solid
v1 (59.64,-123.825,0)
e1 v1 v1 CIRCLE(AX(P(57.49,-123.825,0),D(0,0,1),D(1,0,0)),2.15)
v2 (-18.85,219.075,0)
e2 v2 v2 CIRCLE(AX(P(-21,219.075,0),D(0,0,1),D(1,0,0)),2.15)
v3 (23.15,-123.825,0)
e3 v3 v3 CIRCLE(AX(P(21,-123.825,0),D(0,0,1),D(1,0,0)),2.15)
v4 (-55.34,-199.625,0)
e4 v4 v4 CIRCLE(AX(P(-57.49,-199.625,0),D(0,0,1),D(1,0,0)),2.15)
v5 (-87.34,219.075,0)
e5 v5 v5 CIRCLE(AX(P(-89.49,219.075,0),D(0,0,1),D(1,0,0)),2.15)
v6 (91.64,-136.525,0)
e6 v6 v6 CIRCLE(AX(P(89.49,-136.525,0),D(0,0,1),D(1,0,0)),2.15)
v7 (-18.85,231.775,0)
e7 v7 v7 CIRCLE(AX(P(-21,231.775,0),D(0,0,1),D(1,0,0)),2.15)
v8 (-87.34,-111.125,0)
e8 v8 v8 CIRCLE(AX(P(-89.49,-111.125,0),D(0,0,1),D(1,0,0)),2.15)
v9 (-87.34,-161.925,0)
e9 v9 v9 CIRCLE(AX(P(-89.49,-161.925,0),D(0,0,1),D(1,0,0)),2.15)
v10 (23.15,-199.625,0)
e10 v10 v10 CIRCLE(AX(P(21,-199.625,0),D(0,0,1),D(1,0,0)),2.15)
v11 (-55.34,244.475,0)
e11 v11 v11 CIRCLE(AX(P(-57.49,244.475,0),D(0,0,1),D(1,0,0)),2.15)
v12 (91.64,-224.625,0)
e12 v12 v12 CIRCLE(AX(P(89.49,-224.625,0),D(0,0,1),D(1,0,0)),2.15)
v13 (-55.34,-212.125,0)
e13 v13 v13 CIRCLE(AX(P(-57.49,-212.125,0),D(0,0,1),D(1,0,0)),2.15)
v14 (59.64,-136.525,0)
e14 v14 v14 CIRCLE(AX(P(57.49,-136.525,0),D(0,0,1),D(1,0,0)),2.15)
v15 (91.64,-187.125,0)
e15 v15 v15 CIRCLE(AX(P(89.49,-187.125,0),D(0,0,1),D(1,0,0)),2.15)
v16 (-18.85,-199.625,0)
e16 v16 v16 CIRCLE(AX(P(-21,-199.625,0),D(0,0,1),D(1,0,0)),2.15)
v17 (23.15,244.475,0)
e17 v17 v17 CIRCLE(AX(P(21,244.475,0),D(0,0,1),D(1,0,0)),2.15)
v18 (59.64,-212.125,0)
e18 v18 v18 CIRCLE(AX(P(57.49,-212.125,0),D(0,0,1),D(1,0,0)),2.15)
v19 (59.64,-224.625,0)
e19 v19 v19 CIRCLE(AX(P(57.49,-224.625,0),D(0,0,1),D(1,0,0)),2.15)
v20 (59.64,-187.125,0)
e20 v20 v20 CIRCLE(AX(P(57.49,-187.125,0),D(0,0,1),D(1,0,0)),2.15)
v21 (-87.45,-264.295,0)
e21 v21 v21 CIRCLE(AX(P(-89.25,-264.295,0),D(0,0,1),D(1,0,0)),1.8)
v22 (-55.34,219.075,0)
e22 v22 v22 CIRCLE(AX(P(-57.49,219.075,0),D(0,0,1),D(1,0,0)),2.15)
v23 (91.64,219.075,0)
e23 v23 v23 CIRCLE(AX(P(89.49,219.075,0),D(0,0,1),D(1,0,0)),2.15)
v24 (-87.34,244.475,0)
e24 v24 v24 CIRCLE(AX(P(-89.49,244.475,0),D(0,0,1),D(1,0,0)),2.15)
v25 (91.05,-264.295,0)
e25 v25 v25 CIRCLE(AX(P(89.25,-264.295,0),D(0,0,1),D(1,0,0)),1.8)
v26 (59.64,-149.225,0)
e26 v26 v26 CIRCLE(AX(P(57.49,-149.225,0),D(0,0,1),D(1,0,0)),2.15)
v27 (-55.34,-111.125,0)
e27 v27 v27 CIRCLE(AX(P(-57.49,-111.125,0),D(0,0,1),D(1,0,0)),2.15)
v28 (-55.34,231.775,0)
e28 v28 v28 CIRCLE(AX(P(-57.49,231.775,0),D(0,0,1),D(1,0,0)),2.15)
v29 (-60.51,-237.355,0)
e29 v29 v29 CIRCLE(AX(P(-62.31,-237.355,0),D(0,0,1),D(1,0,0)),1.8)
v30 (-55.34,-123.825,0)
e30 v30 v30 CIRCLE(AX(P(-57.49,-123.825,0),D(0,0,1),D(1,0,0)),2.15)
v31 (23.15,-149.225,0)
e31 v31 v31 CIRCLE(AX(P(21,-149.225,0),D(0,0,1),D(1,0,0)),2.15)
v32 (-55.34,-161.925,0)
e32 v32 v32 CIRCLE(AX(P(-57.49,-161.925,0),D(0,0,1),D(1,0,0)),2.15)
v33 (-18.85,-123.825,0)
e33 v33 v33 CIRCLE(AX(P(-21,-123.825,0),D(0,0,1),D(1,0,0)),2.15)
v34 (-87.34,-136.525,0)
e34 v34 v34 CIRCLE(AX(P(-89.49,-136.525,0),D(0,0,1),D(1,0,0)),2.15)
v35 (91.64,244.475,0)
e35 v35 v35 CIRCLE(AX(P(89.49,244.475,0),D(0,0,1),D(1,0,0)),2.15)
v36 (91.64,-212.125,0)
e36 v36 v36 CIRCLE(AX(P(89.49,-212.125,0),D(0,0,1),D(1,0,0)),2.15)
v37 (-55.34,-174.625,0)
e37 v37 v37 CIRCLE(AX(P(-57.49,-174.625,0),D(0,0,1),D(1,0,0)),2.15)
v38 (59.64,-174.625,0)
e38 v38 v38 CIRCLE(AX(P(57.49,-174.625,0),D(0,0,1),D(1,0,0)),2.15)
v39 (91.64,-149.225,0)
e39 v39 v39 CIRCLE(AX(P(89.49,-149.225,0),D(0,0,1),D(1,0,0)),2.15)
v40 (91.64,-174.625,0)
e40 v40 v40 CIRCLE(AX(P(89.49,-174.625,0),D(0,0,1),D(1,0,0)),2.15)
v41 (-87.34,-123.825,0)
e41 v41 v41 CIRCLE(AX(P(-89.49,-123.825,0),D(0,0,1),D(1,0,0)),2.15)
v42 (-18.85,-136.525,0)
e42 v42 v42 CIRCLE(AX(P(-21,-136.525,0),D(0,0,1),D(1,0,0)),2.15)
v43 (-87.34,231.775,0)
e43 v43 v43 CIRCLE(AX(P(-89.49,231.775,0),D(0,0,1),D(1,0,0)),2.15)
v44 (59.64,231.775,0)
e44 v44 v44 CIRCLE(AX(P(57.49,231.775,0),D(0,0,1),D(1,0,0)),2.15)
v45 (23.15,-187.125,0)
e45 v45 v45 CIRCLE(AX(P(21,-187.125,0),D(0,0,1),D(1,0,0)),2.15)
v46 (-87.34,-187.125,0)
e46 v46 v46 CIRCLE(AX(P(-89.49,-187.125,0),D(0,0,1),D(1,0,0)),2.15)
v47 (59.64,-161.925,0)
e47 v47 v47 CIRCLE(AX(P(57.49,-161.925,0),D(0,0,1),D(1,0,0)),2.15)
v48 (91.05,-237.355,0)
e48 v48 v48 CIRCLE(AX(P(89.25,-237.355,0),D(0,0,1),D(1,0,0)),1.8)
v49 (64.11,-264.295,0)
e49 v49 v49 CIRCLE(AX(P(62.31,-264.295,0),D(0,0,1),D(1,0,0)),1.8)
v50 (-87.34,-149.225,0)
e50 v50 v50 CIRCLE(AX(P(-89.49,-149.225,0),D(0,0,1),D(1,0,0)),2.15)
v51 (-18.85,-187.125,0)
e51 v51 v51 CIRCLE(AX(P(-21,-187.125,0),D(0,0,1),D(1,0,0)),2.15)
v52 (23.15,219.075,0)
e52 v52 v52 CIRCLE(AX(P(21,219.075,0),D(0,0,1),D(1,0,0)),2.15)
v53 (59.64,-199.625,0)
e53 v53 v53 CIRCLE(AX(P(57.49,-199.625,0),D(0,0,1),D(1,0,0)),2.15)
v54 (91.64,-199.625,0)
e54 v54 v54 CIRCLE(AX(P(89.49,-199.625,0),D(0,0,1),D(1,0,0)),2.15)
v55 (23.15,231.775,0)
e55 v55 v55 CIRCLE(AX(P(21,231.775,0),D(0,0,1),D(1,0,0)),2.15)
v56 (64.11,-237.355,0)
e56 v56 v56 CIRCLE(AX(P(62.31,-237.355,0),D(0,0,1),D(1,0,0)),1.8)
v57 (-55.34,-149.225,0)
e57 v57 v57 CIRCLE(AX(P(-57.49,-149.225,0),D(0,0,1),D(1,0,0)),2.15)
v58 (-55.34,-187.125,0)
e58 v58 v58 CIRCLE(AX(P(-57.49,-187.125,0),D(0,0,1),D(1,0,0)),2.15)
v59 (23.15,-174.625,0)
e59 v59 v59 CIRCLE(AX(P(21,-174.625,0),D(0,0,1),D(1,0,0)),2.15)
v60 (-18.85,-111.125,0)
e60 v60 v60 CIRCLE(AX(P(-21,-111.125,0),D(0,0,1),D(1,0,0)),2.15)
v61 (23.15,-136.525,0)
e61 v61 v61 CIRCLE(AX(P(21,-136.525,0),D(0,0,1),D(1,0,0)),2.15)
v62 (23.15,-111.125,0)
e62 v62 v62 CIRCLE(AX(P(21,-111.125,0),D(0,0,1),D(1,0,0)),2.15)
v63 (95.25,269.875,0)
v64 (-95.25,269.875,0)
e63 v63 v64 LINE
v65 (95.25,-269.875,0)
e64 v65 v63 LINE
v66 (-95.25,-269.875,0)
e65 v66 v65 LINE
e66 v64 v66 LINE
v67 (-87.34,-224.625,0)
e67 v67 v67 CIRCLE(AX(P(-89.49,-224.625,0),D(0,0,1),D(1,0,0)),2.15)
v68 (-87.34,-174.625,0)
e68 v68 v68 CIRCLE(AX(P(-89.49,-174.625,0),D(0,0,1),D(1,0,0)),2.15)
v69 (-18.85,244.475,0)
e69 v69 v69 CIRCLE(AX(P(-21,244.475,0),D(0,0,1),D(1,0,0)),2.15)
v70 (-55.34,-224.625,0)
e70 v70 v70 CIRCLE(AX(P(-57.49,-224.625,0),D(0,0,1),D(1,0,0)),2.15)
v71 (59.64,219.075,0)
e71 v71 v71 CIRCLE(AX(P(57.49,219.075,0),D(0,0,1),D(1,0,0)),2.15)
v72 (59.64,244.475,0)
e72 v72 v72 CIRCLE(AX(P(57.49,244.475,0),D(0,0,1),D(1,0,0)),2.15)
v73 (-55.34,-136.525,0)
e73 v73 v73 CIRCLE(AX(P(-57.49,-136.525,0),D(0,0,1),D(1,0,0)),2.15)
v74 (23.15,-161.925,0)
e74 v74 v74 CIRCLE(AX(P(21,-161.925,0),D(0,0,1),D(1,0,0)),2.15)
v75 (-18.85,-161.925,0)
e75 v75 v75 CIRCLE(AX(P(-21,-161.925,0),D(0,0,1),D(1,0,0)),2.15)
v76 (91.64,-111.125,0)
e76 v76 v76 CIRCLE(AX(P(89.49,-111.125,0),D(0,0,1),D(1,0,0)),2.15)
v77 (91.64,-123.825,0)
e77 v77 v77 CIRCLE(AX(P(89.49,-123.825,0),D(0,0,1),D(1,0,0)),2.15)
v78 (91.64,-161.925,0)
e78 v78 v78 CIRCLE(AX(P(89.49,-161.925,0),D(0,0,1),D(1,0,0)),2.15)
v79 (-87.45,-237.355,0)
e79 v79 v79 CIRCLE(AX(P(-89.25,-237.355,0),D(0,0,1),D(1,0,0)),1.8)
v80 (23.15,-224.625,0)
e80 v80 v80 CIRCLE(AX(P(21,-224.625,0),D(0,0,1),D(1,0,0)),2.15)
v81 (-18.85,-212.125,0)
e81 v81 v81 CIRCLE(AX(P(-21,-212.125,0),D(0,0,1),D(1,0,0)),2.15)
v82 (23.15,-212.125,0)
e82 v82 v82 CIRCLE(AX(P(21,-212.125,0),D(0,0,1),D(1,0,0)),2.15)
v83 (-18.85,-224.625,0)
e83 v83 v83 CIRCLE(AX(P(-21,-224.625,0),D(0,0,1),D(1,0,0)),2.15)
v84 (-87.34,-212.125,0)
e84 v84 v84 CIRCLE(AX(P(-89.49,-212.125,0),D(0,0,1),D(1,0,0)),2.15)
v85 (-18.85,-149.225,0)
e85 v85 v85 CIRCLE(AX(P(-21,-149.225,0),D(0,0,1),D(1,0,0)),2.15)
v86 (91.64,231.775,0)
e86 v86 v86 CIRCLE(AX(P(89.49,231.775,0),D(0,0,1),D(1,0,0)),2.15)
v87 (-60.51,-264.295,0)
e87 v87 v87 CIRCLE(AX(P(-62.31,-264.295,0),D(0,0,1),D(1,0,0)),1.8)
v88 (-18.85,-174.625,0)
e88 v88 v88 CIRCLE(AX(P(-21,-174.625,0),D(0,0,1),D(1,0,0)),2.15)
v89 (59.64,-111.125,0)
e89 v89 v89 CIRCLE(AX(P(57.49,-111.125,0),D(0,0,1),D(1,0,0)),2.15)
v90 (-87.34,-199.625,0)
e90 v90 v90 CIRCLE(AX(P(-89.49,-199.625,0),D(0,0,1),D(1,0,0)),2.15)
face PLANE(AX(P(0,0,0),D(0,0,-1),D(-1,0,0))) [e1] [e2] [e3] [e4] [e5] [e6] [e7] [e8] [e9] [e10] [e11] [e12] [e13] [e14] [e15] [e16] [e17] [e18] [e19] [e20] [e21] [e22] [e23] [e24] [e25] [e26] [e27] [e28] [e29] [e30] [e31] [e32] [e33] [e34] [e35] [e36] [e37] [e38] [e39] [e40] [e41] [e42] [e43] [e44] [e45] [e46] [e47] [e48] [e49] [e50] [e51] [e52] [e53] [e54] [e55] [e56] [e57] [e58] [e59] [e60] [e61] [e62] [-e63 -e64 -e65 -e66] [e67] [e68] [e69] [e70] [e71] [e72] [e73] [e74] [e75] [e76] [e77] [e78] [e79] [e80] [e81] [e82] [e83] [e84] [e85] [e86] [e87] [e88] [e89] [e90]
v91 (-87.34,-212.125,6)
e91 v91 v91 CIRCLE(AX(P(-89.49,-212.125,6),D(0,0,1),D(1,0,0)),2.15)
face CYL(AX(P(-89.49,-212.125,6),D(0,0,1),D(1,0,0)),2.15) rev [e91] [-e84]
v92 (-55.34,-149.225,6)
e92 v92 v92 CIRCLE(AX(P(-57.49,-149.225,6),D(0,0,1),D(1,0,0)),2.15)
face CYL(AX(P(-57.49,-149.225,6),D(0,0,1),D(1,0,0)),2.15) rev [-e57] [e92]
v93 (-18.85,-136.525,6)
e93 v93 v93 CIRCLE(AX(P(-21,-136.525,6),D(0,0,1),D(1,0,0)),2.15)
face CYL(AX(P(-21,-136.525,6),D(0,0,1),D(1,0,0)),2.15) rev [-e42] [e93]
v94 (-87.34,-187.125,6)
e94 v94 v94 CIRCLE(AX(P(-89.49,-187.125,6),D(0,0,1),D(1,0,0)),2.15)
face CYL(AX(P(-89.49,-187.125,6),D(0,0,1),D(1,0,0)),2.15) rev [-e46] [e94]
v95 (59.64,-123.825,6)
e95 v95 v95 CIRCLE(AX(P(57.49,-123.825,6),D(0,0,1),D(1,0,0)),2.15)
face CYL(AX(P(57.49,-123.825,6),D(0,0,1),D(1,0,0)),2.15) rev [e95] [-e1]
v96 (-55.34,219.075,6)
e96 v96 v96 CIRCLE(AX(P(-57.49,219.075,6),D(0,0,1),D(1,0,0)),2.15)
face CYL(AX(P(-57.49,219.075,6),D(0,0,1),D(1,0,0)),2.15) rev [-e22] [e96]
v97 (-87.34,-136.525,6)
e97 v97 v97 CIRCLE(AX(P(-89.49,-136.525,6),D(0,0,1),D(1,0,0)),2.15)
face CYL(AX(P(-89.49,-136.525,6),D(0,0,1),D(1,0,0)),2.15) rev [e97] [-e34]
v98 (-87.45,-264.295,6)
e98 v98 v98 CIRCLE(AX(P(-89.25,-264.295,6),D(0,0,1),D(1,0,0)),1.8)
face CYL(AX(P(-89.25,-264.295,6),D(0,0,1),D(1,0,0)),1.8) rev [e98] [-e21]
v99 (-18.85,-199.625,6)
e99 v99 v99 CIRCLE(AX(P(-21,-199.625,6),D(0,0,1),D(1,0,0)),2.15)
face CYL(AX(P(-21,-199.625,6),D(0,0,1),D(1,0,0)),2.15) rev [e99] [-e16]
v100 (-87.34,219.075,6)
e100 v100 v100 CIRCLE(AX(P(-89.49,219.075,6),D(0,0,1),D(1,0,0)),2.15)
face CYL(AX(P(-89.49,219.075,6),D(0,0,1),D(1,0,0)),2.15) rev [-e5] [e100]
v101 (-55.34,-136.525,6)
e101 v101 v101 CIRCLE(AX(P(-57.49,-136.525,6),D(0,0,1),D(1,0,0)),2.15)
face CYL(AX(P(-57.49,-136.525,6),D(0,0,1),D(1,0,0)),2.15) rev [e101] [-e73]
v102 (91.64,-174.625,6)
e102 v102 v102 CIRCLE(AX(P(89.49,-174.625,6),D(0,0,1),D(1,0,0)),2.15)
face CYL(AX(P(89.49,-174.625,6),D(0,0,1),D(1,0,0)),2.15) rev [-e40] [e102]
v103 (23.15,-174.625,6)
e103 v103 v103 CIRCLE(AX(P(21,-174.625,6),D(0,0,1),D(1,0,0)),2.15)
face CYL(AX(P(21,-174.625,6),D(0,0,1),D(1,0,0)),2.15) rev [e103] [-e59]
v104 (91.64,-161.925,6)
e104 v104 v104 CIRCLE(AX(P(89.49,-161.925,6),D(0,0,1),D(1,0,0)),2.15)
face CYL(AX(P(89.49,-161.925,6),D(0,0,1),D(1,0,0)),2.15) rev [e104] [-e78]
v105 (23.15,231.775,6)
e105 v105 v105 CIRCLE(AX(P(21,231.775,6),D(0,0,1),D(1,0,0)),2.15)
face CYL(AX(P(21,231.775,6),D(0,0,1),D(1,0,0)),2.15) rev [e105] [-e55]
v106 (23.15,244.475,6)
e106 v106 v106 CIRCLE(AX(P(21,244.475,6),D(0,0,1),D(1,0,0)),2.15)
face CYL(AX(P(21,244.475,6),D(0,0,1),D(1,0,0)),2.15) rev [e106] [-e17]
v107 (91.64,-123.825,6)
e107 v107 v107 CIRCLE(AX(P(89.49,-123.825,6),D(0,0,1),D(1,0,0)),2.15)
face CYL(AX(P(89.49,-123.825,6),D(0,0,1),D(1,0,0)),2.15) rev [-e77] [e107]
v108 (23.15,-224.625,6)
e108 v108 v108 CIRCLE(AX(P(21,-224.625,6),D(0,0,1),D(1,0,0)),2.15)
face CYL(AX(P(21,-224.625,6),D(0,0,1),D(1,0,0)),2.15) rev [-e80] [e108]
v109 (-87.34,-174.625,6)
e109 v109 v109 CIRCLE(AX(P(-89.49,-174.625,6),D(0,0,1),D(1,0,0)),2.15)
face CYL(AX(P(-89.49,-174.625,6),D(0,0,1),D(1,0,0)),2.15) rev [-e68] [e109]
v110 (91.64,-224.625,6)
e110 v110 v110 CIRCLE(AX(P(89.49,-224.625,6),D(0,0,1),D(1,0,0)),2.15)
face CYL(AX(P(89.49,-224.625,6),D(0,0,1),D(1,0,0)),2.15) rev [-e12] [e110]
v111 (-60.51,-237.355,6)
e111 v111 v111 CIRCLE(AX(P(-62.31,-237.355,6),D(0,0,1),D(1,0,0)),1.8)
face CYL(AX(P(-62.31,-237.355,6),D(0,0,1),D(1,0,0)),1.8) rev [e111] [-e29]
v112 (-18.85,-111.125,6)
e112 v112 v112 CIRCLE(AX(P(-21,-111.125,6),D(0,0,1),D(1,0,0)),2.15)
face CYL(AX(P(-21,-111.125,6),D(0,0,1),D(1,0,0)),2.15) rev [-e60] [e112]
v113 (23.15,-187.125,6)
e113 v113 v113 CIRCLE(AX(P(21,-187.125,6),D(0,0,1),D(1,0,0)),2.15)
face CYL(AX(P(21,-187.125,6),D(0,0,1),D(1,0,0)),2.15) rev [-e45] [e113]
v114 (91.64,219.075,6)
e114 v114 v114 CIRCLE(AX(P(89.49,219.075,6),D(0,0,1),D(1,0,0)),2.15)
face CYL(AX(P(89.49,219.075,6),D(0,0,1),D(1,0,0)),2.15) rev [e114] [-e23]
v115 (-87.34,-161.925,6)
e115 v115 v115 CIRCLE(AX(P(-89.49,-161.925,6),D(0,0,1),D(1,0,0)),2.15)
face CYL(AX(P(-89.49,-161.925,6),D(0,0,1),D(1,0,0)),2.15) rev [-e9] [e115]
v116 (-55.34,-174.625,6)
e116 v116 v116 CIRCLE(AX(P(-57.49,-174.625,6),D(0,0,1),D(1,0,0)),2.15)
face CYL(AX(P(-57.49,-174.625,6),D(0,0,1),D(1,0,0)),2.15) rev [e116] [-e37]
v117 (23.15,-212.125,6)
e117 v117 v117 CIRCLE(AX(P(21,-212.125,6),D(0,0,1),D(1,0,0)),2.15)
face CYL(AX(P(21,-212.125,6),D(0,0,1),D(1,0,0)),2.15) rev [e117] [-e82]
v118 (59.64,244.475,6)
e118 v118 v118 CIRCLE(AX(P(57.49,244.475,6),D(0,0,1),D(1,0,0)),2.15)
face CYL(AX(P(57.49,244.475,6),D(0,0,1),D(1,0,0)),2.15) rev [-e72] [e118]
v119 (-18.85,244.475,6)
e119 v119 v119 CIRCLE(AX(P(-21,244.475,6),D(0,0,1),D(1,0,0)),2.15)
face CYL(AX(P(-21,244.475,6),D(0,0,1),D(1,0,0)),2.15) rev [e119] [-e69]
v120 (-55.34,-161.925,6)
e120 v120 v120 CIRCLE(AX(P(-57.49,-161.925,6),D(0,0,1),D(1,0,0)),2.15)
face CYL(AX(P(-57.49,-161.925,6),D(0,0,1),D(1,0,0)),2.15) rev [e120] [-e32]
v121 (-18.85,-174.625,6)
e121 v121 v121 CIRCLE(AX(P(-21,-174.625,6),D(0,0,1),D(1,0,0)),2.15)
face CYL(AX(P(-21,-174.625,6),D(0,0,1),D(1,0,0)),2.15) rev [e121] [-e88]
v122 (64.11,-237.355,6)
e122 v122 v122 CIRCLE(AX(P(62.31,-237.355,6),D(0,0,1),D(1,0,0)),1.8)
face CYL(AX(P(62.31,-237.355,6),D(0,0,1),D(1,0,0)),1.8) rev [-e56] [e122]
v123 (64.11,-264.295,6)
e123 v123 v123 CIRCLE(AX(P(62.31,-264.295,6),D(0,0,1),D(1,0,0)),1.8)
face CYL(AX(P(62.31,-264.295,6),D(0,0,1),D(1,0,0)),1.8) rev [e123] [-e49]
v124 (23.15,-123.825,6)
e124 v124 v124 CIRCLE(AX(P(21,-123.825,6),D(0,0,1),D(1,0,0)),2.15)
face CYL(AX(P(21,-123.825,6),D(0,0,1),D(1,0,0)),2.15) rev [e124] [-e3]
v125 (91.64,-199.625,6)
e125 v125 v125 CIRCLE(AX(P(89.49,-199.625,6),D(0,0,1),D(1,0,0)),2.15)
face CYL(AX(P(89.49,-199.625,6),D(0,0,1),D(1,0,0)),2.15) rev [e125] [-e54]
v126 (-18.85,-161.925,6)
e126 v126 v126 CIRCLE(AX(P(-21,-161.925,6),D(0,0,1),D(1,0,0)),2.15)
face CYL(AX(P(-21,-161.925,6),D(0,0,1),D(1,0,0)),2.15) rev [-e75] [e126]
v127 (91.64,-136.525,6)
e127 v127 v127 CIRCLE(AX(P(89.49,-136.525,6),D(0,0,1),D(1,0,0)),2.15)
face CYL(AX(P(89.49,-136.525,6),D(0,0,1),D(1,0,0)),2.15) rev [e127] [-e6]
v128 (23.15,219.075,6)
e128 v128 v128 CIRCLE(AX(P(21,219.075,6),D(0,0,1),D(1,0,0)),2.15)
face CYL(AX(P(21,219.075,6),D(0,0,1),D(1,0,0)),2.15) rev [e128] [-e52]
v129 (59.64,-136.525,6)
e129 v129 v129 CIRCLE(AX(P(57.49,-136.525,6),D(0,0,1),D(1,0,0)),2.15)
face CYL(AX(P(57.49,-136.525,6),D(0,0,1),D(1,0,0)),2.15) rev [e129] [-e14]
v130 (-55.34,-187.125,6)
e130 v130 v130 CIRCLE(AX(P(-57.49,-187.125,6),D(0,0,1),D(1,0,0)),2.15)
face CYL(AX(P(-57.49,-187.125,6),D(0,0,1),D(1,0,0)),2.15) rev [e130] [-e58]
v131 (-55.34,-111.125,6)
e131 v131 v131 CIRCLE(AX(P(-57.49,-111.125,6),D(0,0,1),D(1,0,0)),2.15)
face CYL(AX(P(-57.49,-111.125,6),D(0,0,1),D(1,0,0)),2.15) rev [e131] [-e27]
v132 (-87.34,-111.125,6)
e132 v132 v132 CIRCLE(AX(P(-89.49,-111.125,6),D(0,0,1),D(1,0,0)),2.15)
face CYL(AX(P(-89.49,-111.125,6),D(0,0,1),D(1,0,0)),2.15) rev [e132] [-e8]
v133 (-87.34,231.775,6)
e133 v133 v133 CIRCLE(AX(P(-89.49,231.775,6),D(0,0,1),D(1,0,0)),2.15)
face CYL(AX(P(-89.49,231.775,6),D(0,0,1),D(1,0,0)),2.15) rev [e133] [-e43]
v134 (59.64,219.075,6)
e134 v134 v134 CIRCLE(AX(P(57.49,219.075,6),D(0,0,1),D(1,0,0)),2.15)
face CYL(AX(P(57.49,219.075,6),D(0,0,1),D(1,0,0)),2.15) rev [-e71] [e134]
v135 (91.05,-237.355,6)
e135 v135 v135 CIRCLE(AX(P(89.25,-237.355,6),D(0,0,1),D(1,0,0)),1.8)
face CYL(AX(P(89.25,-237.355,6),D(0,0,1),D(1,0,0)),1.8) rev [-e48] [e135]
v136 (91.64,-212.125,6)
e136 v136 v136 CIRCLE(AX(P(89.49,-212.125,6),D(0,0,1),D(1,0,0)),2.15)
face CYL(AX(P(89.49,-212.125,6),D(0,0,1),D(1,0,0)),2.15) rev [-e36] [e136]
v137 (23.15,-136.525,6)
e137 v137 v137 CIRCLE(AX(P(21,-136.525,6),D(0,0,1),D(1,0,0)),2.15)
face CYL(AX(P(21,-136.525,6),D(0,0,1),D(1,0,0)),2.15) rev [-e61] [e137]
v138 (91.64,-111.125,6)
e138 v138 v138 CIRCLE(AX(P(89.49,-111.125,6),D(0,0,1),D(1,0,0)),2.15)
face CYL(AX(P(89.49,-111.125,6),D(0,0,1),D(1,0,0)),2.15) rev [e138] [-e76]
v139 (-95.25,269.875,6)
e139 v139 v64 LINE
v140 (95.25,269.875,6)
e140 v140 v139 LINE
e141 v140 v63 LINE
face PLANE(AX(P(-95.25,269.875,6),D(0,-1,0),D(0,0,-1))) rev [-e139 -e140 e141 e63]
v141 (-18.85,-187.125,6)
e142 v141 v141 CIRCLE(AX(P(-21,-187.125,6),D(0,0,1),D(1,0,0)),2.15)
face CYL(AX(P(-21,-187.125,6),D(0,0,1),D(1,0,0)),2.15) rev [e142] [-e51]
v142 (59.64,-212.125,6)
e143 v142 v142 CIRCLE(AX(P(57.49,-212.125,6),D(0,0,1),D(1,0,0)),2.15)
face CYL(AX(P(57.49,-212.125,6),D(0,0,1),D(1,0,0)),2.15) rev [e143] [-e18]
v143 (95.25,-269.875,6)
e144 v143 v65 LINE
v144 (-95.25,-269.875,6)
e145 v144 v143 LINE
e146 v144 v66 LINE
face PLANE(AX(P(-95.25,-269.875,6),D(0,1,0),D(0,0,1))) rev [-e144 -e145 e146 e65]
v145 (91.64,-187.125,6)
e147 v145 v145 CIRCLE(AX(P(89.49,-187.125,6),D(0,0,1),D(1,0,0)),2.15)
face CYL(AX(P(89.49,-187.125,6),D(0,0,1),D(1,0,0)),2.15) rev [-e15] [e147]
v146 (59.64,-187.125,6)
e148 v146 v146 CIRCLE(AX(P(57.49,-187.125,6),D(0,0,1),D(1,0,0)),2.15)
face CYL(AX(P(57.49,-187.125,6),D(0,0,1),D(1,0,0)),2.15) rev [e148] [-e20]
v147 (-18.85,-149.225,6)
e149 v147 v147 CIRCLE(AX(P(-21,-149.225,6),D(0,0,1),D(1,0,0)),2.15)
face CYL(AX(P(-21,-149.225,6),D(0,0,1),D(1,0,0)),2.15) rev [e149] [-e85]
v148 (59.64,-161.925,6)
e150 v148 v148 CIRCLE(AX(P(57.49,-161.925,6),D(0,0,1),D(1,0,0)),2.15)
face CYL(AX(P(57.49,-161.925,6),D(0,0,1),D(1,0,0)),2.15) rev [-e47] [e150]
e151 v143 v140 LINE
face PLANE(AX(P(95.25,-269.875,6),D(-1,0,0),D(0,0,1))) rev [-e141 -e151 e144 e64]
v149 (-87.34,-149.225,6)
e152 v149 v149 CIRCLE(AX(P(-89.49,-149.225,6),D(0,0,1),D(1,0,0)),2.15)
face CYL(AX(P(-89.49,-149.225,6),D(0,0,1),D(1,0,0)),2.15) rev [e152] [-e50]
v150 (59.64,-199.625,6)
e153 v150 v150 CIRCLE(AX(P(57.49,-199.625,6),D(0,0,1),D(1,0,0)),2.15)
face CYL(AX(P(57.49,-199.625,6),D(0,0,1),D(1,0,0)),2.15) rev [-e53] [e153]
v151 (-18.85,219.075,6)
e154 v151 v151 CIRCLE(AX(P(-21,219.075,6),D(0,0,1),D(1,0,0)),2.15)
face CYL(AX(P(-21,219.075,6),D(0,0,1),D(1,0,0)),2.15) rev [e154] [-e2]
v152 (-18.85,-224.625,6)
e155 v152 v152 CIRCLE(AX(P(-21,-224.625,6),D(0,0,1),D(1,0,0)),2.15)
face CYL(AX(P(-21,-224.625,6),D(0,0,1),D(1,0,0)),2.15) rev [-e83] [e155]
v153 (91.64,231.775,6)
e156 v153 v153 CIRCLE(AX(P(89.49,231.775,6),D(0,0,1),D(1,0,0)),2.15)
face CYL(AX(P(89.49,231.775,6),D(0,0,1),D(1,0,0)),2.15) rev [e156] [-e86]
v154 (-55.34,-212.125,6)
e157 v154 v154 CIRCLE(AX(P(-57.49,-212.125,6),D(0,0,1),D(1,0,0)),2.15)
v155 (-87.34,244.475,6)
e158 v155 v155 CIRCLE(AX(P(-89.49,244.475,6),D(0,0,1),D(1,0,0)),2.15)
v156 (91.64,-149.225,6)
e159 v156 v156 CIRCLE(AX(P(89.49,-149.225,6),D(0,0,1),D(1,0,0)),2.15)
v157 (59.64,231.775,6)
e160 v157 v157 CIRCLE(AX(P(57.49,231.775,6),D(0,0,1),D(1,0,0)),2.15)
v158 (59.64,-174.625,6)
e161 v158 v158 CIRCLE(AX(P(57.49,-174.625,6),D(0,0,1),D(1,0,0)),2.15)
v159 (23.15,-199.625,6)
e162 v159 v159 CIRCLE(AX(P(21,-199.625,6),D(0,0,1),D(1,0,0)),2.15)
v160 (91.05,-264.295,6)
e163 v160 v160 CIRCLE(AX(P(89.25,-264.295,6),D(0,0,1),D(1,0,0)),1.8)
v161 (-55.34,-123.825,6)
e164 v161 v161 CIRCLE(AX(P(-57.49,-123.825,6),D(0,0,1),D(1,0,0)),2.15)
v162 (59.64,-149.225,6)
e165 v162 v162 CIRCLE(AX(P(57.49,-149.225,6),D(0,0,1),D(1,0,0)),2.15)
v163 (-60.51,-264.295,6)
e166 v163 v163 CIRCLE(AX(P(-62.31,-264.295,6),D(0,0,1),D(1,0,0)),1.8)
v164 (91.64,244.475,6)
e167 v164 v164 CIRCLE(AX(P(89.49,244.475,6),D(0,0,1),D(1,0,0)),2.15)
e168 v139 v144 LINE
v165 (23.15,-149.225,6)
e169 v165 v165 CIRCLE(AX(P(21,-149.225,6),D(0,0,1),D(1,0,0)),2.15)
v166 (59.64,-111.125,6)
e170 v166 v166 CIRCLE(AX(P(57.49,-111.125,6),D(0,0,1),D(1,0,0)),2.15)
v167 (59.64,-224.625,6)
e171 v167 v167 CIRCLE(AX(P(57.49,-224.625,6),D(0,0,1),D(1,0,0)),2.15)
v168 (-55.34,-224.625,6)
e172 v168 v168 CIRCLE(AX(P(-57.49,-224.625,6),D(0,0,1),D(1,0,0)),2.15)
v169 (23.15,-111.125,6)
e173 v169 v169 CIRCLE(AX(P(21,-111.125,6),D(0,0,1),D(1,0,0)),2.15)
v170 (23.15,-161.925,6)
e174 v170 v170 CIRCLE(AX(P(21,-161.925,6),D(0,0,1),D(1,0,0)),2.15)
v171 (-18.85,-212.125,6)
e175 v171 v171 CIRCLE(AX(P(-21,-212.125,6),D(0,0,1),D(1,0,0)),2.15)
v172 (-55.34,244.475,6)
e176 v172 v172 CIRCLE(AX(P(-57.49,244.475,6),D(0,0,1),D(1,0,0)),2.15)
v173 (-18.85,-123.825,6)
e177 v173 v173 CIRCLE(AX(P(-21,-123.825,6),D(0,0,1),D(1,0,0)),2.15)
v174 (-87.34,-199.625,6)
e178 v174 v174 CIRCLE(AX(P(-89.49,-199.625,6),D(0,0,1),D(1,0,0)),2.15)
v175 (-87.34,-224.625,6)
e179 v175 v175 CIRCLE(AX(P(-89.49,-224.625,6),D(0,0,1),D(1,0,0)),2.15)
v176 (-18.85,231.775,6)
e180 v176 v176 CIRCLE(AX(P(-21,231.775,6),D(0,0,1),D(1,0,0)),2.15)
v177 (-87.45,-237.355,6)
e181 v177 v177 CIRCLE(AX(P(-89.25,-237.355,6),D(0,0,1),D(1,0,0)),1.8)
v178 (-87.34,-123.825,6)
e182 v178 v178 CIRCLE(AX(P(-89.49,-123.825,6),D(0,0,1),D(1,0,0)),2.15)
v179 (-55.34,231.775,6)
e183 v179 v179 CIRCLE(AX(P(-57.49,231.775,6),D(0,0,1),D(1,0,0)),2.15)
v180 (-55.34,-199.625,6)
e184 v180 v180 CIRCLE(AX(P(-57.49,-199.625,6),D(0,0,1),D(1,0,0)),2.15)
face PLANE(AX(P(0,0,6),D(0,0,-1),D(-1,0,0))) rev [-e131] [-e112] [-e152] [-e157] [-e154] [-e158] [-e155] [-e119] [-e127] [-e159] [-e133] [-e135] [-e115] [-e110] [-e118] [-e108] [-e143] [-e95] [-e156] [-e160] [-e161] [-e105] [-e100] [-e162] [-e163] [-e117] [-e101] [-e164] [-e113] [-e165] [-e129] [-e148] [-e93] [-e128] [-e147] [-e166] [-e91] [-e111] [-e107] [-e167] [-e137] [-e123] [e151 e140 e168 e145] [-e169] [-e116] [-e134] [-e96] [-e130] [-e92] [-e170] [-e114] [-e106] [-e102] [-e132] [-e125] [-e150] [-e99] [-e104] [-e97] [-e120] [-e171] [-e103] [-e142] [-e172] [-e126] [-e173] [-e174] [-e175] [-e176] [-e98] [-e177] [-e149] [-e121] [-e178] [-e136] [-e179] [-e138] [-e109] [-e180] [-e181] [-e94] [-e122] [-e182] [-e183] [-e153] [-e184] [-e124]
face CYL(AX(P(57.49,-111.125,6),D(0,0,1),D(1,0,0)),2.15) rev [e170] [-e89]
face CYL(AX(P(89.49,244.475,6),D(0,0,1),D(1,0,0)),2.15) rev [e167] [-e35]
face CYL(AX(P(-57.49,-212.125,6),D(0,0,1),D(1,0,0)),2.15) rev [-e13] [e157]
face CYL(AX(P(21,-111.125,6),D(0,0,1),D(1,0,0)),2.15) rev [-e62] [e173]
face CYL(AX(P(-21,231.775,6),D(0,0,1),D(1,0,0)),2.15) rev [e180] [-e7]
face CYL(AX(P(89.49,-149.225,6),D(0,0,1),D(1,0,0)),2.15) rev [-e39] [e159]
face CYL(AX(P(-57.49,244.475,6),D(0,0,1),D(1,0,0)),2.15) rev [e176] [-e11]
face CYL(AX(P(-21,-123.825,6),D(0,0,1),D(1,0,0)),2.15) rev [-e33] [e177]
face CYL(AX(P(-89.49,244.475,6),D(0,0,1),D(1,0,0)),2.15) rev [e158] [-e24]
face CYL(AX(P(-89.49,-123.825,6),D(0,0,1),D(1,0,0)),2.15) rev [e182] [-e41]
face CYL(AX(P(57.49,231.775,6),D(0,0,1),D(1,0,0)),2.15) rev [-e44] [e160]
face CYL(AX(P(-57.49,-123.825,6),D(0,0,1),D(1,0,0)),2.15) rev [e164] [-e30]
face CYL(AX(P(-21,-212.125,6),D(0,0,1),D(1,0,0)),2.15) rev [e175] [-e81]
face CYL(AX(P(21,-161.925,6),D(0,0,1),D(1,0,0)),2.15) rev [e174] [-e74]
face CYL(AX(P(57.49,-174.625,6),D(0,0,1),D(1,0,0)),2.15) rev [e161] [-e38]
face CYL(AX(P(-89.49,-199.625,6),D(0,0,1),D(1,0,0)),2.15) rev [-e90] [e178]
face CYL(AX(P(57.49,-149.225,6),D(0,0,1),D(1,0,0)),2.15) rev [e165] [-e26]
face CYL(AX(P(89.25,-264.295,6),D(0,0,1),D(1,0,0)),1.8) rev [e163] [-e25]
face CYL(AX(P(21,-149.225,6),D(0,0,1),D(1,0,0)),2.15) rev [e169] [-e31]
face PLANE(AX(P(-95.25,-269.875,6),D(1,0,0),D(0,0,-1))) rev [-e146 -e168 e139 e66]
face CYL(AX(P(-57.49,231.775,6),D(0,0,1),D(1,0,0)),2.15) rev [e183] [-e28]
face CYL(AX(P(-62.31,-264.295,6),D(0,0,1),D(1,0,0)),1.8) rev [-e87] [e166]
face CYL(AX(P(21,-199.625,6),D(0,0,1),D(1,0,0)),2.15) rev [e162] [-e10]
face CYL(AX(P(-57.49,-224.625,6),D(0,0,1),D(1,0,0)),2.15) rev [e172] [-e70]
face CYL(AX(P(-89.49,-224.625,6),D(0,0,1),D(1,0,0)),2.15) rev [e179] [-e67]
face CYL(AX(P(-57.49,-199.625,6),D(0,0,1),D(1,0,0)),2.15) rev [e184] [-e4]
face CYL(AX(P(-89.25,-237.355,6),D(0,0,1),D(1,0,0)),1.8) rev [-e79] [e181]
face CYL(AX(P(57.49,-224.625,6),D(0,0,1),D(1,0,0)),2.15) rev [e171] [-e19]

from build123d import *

# Parameters (mm, degrees)
ESQUISSE1_W              = 190.5
ESQUISSE1_H              = 539.75
BOSS_EXTRU_1_DEPTH       = 6
D_GAGEMENT_M41_OUTLINE_R = 2.15
D_GAGEMENT_M41_DEPTH     = 6
D_GAGEMENT_M31_D         = 3.6
D_GAGEMENT_M31_DEPTH     = 6
D_GAGEMENT_M31_TIP       = 1.081549114


# Read off the part's stored shape, not the designer's step: Dégagement M41
with BuildPart() as part:
    # Esquisse1 → Boss.-Extru.1 (new body)
    with BuildSketch(Plane.XY):
        Rectangle(ESQUISSE1_W, ESQUISSE1_H)
    extrude(amount=BOSS_EXTRU_1_DEPTH)

    # Dégagement M41 outline → Dégagement M41 (cut)
    with BuildSketch(Plane.XY):
        with Locations((89.49, -224.625)):
            Circle(D_GAGEMENT_M41_OUTLINE_R)
        with Locations((57.49, -224.625)):
            Circle(D_GAGEMENT_M41_OUTLINE_R)
        with Locations((21, -224.625)):
            Circle(D_GAGEMENT_M41_OUTLINE_R)
        with Locations((-21, -224.625)):
            Circle(D_GAGEMENT_M41_OUTLINE_R)
        with Locations((-57.49, -224.625)):
            Circle(D_GAGEMENT_M41_OUTLINE_R)
        with Locations((-89.49, -224.625)):
            Circle(D_GAGEMENT_M41_OUTLINE_R)
        with Locations((89.49, -212.125)):
            Circle(D_GAGEMENT_M41_OUTLINE_R)
        with Locations((57.49, -212.125)):
            Circle(D_GAGEMENT_M41_OUTLINE_R)
        with Locations((21, -212.125)):
            Circle(D_GAGEMENT_M41_OUTLINE_R)
        with Locations((-21, -212.125)):
            Circle(D_GAGEMENT_M41_OUTLINE_R)
        with Locations((-57.49, -212.125)):
            Circle(D_GAGEMENT_M41_OUTLINE_R)
        with Locations((-89.49, -212.125)):
            Circle(D_GAGEMENT_M41_OUTLINE_R)
        with Locations((89.49, -199.625)):
            Circle(D_GAGEMENT_M41_OUTLINE_R)
        with Locations((57.49, -199.625)):
            Circle(D_GAGEMENT_M41_OUTLINE_R)
        with Locations((21, -199.625)):
            Circle(D_GAGEMENT_M41_OUTLINE_R)
        with Locations((-21, -199.625)):
            Circle(D_GAGEMENT_M41_OUTLINE_R)
        with Locations((-57.49, -199.625)):
            Circle(D_GAGEMENT_M41_OUTLINE_R)
        with Locations((-89.49, -199.625)):
            Circle(D_GAGEMENT_M41_OUTLINE_R)
        with Locations((89.49, -187.125)):
            Circle(D_GAGEMENT_M41_OUTLINE_R)
        with Locations((57.49, -187.125)):
            Circle(D_GAGEMENT_M41_OUTLINE_R)
        with Locations((21, -187.125)):
            Circle(D_GAGEMENT_M41_OUTLINE_R)
        with Locations((-21, -187.125)):
            Circle(D_GAGEMENT_M41_OUTLINE_R)
        with Locations((-57.49, -187.125)):
            Circle(D_GAGEMENT_M41_OUTLINE_R)
        with Locations((-89.49, -187.125)):
            Circle(D_GAGEMENT_M41_OUTLINE_R)
        with Locations((89.49, -174.625)):
            Circle(D_GAGEMENT_M41_OUTLINE_R)
        with Locations((57.49, -174.625)):
            Circle(D_GAGEMENT_M41_OUTLINE_R)
        with Locations((21, -174.625)):
            Circle(D_GAGEMENT_M41_OUTLINE_R)
        with Locations((-21, -174.625)):
            Circle(D_GAGEMENT_M41_OUTLINE_R)
        with Locations((-57.49, -174.625)):
            Circle(D_GAGEMENT_M41_OUTLINE_R)
        with Locations((-89.49, -174.625)):
            Circle(D_GAGEMENT_M41_OUTLINE_R)
        with Locations((89.49, -161.925)):
            Circle(D_GAGEMENT_M41_OUTLINE_R)
        with Locations((57.49, -161.925)):
            Circle(D_GAGEMENT_M41_OUTLINE_R)
        with Locations((21, -161.925)):
            Circle(D_GAGEMENT_M41_OUTLINE_R)
        with Locations((-21, -161.925)):
            Circle(D_GAGEMENT_M41_OUTLINE_R)
        with Locations((-57.49, -161.925)):
            Circle(D_GAGEMENT_M41_OUTLINE_R)
        with Locations((-89.49, -161.925)):
            Circle(D_GAGEMENT_M41_OUTLINE_R)
        with Locations((89.49, -149.225)):
            Circle(D_GAGEMENT_M41_OUTLINE_R)
        with Locations((57.49, -149.225)):
            Circle(D_GAGEMENT_M41_OUTLINE_R)
        with Locations((21, -149.225)):
            Circle(D_GAGEMENT_M41_OUTLINE_R)
        with Locations((-21, -149.225)):
            Circle(D_GAGEMENT_M41_OUTLINE_R)
        with Locations((-57.49, -149.225)):
            Circle(D_GAGEMENT_M41_OUTLINE_R)
        with Locations((-89.49, -149.225)):
            Circle(D_GAGEMENT_M41_OUTLINE_R)
        with Locations((89.49, -136.525)):
            Circle(D_GAGEMENT_M41_OUTLINE_R)
        with Locations((57.49, -136.525)):
            Circle(D_GAGEMENT_M41_OUTLINE_R)
        with Locations((21, -136.525)):
            Circle(D_GAGEMENT_M41_OUTLINE_R)
        with Locations((-21, -136.525)):
            Circle(D_GAGEMENT_M41_OUTLINE_R)
        with Locations((-57.49, -136.525)):
            Circle(D_GAGEMENT_M41_OUTLINE_R)
        with Locations((-89.49, -136.525)):
            Circle(D_GAGEMENT_M41_OUTLINE_R)
        with Locations((89.49, -123.825)):
            Circle(D_GAGEMENT_M41_OUTLINE_R)
        with Locations((57.49, -123.825)):
            Circle(D_GAGEMENT_M41_OUTLINE_R)
        with Locations((21, -123.825)):
            Circle(D_GAGEMENT_M41_OUTLINE_R)
        with Locations((-21, -123.825)):
            Circle(D_GAGEMENT_M41_OUTLINE_R)
        with Locations((-57.49, -123.825)):
            Circle(D_GAGEMENT_M41_OUTLINE_R)
        with Locations((-89.49, -123.825)):
            Circle(D_GAGEMENT_M41_OUTLINE_R)
        with Locations((89.49, -111.125)):
            Circle(D_GAGEMENT_M41_OUTLINE_R)
        with Locations((57.49, -111.125)):
            Circle(D_GAGEMENT_M41_OUTLINE_R)
        with Locations((21, -111.125)):
            Circle(D_GAGEMENT_M41_OUTLINE_R)
        with Locations((-21, -111.125)):
            Circle(D_GAGEMENT_M41_OUTLINE_R)
        with Locations((-57.49, -111.125)):
            Circle(D_GAGEMENT_M41_OUTLINE_R)
        with Locations((-89.49, -111.125)):
            Circle(D_GAGEMENT_M41_OUTLINE_R)
        with Locations((89.49, 219.075)):
            Circle(D_GAGEMENT_M41_OUTLINE_R)
        with Locations((57.49, 219.075)):
            Circle(D_GAGEMENT_M41_OUTLINE_R)
        with Locations((21, 219.075)):
            Circle(D_GAGEMENT_M41_OUTLINE_R)
        with Locations((-21, 219.075)):
            Circle(D_GAGEMENT_M41_OUTLINE_R)
        with Locations((-57.49, 219.075)):
            Circle(D_GAGEMENT_M41_OUTLINE_R)
        with Locations((-89.49, 219.075)):
            Circle(D_GAGEMENT_M41_OUTLINE_R)
        with Locations((89.49, 231.775)):
            Circle(D_GAGEMENT_M41_OUTLINE_R)
        with Locations((57.49, 231.775)):
            Circle(D_GAGEMENT_M41_OUTLINE_R)
        with Locations((21, 231.775)):
            Circle(D_GAGEMENT_M41_OUTLINE_R)
        with Locations((-21, 231.775)):
            Circle(D_GAGEMENT_M41_OUTLINE_R)
        with Locations((-57.49, 231.775)):
            Circle(D_GAGEMENT_M41_OUTLINE_R)
        with Locations((-89.49, 231.775)):
            Circle(D_GAGEMENT_M41_OUTLINE_R)
        with Locations((89.49, 244.475)):
            Circle(D_GAGEMENT_M41_OUTLINE_R)
        with Locations((57.49, 244.475)):
            Circle(D_GAGEMENT_M41_OUTLINE_R)
        with Locations((21, 244.475)):
            Circle(D_GAGEMENT_M41_OUTLINE_R)
        with Locations((-21, 244.475)):
            Circle(D_GAGEMENT_M41_OUTLINE_R)
        with Locations((-57.49, 244.475)):
            Circle(D_GAGEMENT_M41_OUTLINE_R)
        with Locations((-89.49, 244.475)):
            Circle(D_GAGEMENT_M41_OUTLINE_R)
    extrude(amount=D_GAGEMENT_M41_DEPTH, mode=Mode.SUBTRACT)

    # Dégagement M31
    with Locations(Plane(origin=(-89.25, -237.355, 6), x_dir=(1, 0, 0), z_dir=(0, 0, 1))):
        with Locations((0, 0), (26.94, 0), (0, -26.94), (26.94, -26.94), (151.56, 0), (178.5, 0), (151.56, -26.94), (178.5, -26.94)):
            Hole(D_GAGEMENT_M31_D / 2, depth=D_GAGEMENT_M31_DEPTH)
            with Locations((0, 0, -(D_GAGEMENT_M31_DEPTH + D_GAGEMENT_M31_TIP / 2))):  # 118° drill point
                Cone(0, D_GAGEMENT_M31_D / 2, D_GAGEMENT_M31_TIP, mode=Mode.SUBTRACT)


solid = part.part
